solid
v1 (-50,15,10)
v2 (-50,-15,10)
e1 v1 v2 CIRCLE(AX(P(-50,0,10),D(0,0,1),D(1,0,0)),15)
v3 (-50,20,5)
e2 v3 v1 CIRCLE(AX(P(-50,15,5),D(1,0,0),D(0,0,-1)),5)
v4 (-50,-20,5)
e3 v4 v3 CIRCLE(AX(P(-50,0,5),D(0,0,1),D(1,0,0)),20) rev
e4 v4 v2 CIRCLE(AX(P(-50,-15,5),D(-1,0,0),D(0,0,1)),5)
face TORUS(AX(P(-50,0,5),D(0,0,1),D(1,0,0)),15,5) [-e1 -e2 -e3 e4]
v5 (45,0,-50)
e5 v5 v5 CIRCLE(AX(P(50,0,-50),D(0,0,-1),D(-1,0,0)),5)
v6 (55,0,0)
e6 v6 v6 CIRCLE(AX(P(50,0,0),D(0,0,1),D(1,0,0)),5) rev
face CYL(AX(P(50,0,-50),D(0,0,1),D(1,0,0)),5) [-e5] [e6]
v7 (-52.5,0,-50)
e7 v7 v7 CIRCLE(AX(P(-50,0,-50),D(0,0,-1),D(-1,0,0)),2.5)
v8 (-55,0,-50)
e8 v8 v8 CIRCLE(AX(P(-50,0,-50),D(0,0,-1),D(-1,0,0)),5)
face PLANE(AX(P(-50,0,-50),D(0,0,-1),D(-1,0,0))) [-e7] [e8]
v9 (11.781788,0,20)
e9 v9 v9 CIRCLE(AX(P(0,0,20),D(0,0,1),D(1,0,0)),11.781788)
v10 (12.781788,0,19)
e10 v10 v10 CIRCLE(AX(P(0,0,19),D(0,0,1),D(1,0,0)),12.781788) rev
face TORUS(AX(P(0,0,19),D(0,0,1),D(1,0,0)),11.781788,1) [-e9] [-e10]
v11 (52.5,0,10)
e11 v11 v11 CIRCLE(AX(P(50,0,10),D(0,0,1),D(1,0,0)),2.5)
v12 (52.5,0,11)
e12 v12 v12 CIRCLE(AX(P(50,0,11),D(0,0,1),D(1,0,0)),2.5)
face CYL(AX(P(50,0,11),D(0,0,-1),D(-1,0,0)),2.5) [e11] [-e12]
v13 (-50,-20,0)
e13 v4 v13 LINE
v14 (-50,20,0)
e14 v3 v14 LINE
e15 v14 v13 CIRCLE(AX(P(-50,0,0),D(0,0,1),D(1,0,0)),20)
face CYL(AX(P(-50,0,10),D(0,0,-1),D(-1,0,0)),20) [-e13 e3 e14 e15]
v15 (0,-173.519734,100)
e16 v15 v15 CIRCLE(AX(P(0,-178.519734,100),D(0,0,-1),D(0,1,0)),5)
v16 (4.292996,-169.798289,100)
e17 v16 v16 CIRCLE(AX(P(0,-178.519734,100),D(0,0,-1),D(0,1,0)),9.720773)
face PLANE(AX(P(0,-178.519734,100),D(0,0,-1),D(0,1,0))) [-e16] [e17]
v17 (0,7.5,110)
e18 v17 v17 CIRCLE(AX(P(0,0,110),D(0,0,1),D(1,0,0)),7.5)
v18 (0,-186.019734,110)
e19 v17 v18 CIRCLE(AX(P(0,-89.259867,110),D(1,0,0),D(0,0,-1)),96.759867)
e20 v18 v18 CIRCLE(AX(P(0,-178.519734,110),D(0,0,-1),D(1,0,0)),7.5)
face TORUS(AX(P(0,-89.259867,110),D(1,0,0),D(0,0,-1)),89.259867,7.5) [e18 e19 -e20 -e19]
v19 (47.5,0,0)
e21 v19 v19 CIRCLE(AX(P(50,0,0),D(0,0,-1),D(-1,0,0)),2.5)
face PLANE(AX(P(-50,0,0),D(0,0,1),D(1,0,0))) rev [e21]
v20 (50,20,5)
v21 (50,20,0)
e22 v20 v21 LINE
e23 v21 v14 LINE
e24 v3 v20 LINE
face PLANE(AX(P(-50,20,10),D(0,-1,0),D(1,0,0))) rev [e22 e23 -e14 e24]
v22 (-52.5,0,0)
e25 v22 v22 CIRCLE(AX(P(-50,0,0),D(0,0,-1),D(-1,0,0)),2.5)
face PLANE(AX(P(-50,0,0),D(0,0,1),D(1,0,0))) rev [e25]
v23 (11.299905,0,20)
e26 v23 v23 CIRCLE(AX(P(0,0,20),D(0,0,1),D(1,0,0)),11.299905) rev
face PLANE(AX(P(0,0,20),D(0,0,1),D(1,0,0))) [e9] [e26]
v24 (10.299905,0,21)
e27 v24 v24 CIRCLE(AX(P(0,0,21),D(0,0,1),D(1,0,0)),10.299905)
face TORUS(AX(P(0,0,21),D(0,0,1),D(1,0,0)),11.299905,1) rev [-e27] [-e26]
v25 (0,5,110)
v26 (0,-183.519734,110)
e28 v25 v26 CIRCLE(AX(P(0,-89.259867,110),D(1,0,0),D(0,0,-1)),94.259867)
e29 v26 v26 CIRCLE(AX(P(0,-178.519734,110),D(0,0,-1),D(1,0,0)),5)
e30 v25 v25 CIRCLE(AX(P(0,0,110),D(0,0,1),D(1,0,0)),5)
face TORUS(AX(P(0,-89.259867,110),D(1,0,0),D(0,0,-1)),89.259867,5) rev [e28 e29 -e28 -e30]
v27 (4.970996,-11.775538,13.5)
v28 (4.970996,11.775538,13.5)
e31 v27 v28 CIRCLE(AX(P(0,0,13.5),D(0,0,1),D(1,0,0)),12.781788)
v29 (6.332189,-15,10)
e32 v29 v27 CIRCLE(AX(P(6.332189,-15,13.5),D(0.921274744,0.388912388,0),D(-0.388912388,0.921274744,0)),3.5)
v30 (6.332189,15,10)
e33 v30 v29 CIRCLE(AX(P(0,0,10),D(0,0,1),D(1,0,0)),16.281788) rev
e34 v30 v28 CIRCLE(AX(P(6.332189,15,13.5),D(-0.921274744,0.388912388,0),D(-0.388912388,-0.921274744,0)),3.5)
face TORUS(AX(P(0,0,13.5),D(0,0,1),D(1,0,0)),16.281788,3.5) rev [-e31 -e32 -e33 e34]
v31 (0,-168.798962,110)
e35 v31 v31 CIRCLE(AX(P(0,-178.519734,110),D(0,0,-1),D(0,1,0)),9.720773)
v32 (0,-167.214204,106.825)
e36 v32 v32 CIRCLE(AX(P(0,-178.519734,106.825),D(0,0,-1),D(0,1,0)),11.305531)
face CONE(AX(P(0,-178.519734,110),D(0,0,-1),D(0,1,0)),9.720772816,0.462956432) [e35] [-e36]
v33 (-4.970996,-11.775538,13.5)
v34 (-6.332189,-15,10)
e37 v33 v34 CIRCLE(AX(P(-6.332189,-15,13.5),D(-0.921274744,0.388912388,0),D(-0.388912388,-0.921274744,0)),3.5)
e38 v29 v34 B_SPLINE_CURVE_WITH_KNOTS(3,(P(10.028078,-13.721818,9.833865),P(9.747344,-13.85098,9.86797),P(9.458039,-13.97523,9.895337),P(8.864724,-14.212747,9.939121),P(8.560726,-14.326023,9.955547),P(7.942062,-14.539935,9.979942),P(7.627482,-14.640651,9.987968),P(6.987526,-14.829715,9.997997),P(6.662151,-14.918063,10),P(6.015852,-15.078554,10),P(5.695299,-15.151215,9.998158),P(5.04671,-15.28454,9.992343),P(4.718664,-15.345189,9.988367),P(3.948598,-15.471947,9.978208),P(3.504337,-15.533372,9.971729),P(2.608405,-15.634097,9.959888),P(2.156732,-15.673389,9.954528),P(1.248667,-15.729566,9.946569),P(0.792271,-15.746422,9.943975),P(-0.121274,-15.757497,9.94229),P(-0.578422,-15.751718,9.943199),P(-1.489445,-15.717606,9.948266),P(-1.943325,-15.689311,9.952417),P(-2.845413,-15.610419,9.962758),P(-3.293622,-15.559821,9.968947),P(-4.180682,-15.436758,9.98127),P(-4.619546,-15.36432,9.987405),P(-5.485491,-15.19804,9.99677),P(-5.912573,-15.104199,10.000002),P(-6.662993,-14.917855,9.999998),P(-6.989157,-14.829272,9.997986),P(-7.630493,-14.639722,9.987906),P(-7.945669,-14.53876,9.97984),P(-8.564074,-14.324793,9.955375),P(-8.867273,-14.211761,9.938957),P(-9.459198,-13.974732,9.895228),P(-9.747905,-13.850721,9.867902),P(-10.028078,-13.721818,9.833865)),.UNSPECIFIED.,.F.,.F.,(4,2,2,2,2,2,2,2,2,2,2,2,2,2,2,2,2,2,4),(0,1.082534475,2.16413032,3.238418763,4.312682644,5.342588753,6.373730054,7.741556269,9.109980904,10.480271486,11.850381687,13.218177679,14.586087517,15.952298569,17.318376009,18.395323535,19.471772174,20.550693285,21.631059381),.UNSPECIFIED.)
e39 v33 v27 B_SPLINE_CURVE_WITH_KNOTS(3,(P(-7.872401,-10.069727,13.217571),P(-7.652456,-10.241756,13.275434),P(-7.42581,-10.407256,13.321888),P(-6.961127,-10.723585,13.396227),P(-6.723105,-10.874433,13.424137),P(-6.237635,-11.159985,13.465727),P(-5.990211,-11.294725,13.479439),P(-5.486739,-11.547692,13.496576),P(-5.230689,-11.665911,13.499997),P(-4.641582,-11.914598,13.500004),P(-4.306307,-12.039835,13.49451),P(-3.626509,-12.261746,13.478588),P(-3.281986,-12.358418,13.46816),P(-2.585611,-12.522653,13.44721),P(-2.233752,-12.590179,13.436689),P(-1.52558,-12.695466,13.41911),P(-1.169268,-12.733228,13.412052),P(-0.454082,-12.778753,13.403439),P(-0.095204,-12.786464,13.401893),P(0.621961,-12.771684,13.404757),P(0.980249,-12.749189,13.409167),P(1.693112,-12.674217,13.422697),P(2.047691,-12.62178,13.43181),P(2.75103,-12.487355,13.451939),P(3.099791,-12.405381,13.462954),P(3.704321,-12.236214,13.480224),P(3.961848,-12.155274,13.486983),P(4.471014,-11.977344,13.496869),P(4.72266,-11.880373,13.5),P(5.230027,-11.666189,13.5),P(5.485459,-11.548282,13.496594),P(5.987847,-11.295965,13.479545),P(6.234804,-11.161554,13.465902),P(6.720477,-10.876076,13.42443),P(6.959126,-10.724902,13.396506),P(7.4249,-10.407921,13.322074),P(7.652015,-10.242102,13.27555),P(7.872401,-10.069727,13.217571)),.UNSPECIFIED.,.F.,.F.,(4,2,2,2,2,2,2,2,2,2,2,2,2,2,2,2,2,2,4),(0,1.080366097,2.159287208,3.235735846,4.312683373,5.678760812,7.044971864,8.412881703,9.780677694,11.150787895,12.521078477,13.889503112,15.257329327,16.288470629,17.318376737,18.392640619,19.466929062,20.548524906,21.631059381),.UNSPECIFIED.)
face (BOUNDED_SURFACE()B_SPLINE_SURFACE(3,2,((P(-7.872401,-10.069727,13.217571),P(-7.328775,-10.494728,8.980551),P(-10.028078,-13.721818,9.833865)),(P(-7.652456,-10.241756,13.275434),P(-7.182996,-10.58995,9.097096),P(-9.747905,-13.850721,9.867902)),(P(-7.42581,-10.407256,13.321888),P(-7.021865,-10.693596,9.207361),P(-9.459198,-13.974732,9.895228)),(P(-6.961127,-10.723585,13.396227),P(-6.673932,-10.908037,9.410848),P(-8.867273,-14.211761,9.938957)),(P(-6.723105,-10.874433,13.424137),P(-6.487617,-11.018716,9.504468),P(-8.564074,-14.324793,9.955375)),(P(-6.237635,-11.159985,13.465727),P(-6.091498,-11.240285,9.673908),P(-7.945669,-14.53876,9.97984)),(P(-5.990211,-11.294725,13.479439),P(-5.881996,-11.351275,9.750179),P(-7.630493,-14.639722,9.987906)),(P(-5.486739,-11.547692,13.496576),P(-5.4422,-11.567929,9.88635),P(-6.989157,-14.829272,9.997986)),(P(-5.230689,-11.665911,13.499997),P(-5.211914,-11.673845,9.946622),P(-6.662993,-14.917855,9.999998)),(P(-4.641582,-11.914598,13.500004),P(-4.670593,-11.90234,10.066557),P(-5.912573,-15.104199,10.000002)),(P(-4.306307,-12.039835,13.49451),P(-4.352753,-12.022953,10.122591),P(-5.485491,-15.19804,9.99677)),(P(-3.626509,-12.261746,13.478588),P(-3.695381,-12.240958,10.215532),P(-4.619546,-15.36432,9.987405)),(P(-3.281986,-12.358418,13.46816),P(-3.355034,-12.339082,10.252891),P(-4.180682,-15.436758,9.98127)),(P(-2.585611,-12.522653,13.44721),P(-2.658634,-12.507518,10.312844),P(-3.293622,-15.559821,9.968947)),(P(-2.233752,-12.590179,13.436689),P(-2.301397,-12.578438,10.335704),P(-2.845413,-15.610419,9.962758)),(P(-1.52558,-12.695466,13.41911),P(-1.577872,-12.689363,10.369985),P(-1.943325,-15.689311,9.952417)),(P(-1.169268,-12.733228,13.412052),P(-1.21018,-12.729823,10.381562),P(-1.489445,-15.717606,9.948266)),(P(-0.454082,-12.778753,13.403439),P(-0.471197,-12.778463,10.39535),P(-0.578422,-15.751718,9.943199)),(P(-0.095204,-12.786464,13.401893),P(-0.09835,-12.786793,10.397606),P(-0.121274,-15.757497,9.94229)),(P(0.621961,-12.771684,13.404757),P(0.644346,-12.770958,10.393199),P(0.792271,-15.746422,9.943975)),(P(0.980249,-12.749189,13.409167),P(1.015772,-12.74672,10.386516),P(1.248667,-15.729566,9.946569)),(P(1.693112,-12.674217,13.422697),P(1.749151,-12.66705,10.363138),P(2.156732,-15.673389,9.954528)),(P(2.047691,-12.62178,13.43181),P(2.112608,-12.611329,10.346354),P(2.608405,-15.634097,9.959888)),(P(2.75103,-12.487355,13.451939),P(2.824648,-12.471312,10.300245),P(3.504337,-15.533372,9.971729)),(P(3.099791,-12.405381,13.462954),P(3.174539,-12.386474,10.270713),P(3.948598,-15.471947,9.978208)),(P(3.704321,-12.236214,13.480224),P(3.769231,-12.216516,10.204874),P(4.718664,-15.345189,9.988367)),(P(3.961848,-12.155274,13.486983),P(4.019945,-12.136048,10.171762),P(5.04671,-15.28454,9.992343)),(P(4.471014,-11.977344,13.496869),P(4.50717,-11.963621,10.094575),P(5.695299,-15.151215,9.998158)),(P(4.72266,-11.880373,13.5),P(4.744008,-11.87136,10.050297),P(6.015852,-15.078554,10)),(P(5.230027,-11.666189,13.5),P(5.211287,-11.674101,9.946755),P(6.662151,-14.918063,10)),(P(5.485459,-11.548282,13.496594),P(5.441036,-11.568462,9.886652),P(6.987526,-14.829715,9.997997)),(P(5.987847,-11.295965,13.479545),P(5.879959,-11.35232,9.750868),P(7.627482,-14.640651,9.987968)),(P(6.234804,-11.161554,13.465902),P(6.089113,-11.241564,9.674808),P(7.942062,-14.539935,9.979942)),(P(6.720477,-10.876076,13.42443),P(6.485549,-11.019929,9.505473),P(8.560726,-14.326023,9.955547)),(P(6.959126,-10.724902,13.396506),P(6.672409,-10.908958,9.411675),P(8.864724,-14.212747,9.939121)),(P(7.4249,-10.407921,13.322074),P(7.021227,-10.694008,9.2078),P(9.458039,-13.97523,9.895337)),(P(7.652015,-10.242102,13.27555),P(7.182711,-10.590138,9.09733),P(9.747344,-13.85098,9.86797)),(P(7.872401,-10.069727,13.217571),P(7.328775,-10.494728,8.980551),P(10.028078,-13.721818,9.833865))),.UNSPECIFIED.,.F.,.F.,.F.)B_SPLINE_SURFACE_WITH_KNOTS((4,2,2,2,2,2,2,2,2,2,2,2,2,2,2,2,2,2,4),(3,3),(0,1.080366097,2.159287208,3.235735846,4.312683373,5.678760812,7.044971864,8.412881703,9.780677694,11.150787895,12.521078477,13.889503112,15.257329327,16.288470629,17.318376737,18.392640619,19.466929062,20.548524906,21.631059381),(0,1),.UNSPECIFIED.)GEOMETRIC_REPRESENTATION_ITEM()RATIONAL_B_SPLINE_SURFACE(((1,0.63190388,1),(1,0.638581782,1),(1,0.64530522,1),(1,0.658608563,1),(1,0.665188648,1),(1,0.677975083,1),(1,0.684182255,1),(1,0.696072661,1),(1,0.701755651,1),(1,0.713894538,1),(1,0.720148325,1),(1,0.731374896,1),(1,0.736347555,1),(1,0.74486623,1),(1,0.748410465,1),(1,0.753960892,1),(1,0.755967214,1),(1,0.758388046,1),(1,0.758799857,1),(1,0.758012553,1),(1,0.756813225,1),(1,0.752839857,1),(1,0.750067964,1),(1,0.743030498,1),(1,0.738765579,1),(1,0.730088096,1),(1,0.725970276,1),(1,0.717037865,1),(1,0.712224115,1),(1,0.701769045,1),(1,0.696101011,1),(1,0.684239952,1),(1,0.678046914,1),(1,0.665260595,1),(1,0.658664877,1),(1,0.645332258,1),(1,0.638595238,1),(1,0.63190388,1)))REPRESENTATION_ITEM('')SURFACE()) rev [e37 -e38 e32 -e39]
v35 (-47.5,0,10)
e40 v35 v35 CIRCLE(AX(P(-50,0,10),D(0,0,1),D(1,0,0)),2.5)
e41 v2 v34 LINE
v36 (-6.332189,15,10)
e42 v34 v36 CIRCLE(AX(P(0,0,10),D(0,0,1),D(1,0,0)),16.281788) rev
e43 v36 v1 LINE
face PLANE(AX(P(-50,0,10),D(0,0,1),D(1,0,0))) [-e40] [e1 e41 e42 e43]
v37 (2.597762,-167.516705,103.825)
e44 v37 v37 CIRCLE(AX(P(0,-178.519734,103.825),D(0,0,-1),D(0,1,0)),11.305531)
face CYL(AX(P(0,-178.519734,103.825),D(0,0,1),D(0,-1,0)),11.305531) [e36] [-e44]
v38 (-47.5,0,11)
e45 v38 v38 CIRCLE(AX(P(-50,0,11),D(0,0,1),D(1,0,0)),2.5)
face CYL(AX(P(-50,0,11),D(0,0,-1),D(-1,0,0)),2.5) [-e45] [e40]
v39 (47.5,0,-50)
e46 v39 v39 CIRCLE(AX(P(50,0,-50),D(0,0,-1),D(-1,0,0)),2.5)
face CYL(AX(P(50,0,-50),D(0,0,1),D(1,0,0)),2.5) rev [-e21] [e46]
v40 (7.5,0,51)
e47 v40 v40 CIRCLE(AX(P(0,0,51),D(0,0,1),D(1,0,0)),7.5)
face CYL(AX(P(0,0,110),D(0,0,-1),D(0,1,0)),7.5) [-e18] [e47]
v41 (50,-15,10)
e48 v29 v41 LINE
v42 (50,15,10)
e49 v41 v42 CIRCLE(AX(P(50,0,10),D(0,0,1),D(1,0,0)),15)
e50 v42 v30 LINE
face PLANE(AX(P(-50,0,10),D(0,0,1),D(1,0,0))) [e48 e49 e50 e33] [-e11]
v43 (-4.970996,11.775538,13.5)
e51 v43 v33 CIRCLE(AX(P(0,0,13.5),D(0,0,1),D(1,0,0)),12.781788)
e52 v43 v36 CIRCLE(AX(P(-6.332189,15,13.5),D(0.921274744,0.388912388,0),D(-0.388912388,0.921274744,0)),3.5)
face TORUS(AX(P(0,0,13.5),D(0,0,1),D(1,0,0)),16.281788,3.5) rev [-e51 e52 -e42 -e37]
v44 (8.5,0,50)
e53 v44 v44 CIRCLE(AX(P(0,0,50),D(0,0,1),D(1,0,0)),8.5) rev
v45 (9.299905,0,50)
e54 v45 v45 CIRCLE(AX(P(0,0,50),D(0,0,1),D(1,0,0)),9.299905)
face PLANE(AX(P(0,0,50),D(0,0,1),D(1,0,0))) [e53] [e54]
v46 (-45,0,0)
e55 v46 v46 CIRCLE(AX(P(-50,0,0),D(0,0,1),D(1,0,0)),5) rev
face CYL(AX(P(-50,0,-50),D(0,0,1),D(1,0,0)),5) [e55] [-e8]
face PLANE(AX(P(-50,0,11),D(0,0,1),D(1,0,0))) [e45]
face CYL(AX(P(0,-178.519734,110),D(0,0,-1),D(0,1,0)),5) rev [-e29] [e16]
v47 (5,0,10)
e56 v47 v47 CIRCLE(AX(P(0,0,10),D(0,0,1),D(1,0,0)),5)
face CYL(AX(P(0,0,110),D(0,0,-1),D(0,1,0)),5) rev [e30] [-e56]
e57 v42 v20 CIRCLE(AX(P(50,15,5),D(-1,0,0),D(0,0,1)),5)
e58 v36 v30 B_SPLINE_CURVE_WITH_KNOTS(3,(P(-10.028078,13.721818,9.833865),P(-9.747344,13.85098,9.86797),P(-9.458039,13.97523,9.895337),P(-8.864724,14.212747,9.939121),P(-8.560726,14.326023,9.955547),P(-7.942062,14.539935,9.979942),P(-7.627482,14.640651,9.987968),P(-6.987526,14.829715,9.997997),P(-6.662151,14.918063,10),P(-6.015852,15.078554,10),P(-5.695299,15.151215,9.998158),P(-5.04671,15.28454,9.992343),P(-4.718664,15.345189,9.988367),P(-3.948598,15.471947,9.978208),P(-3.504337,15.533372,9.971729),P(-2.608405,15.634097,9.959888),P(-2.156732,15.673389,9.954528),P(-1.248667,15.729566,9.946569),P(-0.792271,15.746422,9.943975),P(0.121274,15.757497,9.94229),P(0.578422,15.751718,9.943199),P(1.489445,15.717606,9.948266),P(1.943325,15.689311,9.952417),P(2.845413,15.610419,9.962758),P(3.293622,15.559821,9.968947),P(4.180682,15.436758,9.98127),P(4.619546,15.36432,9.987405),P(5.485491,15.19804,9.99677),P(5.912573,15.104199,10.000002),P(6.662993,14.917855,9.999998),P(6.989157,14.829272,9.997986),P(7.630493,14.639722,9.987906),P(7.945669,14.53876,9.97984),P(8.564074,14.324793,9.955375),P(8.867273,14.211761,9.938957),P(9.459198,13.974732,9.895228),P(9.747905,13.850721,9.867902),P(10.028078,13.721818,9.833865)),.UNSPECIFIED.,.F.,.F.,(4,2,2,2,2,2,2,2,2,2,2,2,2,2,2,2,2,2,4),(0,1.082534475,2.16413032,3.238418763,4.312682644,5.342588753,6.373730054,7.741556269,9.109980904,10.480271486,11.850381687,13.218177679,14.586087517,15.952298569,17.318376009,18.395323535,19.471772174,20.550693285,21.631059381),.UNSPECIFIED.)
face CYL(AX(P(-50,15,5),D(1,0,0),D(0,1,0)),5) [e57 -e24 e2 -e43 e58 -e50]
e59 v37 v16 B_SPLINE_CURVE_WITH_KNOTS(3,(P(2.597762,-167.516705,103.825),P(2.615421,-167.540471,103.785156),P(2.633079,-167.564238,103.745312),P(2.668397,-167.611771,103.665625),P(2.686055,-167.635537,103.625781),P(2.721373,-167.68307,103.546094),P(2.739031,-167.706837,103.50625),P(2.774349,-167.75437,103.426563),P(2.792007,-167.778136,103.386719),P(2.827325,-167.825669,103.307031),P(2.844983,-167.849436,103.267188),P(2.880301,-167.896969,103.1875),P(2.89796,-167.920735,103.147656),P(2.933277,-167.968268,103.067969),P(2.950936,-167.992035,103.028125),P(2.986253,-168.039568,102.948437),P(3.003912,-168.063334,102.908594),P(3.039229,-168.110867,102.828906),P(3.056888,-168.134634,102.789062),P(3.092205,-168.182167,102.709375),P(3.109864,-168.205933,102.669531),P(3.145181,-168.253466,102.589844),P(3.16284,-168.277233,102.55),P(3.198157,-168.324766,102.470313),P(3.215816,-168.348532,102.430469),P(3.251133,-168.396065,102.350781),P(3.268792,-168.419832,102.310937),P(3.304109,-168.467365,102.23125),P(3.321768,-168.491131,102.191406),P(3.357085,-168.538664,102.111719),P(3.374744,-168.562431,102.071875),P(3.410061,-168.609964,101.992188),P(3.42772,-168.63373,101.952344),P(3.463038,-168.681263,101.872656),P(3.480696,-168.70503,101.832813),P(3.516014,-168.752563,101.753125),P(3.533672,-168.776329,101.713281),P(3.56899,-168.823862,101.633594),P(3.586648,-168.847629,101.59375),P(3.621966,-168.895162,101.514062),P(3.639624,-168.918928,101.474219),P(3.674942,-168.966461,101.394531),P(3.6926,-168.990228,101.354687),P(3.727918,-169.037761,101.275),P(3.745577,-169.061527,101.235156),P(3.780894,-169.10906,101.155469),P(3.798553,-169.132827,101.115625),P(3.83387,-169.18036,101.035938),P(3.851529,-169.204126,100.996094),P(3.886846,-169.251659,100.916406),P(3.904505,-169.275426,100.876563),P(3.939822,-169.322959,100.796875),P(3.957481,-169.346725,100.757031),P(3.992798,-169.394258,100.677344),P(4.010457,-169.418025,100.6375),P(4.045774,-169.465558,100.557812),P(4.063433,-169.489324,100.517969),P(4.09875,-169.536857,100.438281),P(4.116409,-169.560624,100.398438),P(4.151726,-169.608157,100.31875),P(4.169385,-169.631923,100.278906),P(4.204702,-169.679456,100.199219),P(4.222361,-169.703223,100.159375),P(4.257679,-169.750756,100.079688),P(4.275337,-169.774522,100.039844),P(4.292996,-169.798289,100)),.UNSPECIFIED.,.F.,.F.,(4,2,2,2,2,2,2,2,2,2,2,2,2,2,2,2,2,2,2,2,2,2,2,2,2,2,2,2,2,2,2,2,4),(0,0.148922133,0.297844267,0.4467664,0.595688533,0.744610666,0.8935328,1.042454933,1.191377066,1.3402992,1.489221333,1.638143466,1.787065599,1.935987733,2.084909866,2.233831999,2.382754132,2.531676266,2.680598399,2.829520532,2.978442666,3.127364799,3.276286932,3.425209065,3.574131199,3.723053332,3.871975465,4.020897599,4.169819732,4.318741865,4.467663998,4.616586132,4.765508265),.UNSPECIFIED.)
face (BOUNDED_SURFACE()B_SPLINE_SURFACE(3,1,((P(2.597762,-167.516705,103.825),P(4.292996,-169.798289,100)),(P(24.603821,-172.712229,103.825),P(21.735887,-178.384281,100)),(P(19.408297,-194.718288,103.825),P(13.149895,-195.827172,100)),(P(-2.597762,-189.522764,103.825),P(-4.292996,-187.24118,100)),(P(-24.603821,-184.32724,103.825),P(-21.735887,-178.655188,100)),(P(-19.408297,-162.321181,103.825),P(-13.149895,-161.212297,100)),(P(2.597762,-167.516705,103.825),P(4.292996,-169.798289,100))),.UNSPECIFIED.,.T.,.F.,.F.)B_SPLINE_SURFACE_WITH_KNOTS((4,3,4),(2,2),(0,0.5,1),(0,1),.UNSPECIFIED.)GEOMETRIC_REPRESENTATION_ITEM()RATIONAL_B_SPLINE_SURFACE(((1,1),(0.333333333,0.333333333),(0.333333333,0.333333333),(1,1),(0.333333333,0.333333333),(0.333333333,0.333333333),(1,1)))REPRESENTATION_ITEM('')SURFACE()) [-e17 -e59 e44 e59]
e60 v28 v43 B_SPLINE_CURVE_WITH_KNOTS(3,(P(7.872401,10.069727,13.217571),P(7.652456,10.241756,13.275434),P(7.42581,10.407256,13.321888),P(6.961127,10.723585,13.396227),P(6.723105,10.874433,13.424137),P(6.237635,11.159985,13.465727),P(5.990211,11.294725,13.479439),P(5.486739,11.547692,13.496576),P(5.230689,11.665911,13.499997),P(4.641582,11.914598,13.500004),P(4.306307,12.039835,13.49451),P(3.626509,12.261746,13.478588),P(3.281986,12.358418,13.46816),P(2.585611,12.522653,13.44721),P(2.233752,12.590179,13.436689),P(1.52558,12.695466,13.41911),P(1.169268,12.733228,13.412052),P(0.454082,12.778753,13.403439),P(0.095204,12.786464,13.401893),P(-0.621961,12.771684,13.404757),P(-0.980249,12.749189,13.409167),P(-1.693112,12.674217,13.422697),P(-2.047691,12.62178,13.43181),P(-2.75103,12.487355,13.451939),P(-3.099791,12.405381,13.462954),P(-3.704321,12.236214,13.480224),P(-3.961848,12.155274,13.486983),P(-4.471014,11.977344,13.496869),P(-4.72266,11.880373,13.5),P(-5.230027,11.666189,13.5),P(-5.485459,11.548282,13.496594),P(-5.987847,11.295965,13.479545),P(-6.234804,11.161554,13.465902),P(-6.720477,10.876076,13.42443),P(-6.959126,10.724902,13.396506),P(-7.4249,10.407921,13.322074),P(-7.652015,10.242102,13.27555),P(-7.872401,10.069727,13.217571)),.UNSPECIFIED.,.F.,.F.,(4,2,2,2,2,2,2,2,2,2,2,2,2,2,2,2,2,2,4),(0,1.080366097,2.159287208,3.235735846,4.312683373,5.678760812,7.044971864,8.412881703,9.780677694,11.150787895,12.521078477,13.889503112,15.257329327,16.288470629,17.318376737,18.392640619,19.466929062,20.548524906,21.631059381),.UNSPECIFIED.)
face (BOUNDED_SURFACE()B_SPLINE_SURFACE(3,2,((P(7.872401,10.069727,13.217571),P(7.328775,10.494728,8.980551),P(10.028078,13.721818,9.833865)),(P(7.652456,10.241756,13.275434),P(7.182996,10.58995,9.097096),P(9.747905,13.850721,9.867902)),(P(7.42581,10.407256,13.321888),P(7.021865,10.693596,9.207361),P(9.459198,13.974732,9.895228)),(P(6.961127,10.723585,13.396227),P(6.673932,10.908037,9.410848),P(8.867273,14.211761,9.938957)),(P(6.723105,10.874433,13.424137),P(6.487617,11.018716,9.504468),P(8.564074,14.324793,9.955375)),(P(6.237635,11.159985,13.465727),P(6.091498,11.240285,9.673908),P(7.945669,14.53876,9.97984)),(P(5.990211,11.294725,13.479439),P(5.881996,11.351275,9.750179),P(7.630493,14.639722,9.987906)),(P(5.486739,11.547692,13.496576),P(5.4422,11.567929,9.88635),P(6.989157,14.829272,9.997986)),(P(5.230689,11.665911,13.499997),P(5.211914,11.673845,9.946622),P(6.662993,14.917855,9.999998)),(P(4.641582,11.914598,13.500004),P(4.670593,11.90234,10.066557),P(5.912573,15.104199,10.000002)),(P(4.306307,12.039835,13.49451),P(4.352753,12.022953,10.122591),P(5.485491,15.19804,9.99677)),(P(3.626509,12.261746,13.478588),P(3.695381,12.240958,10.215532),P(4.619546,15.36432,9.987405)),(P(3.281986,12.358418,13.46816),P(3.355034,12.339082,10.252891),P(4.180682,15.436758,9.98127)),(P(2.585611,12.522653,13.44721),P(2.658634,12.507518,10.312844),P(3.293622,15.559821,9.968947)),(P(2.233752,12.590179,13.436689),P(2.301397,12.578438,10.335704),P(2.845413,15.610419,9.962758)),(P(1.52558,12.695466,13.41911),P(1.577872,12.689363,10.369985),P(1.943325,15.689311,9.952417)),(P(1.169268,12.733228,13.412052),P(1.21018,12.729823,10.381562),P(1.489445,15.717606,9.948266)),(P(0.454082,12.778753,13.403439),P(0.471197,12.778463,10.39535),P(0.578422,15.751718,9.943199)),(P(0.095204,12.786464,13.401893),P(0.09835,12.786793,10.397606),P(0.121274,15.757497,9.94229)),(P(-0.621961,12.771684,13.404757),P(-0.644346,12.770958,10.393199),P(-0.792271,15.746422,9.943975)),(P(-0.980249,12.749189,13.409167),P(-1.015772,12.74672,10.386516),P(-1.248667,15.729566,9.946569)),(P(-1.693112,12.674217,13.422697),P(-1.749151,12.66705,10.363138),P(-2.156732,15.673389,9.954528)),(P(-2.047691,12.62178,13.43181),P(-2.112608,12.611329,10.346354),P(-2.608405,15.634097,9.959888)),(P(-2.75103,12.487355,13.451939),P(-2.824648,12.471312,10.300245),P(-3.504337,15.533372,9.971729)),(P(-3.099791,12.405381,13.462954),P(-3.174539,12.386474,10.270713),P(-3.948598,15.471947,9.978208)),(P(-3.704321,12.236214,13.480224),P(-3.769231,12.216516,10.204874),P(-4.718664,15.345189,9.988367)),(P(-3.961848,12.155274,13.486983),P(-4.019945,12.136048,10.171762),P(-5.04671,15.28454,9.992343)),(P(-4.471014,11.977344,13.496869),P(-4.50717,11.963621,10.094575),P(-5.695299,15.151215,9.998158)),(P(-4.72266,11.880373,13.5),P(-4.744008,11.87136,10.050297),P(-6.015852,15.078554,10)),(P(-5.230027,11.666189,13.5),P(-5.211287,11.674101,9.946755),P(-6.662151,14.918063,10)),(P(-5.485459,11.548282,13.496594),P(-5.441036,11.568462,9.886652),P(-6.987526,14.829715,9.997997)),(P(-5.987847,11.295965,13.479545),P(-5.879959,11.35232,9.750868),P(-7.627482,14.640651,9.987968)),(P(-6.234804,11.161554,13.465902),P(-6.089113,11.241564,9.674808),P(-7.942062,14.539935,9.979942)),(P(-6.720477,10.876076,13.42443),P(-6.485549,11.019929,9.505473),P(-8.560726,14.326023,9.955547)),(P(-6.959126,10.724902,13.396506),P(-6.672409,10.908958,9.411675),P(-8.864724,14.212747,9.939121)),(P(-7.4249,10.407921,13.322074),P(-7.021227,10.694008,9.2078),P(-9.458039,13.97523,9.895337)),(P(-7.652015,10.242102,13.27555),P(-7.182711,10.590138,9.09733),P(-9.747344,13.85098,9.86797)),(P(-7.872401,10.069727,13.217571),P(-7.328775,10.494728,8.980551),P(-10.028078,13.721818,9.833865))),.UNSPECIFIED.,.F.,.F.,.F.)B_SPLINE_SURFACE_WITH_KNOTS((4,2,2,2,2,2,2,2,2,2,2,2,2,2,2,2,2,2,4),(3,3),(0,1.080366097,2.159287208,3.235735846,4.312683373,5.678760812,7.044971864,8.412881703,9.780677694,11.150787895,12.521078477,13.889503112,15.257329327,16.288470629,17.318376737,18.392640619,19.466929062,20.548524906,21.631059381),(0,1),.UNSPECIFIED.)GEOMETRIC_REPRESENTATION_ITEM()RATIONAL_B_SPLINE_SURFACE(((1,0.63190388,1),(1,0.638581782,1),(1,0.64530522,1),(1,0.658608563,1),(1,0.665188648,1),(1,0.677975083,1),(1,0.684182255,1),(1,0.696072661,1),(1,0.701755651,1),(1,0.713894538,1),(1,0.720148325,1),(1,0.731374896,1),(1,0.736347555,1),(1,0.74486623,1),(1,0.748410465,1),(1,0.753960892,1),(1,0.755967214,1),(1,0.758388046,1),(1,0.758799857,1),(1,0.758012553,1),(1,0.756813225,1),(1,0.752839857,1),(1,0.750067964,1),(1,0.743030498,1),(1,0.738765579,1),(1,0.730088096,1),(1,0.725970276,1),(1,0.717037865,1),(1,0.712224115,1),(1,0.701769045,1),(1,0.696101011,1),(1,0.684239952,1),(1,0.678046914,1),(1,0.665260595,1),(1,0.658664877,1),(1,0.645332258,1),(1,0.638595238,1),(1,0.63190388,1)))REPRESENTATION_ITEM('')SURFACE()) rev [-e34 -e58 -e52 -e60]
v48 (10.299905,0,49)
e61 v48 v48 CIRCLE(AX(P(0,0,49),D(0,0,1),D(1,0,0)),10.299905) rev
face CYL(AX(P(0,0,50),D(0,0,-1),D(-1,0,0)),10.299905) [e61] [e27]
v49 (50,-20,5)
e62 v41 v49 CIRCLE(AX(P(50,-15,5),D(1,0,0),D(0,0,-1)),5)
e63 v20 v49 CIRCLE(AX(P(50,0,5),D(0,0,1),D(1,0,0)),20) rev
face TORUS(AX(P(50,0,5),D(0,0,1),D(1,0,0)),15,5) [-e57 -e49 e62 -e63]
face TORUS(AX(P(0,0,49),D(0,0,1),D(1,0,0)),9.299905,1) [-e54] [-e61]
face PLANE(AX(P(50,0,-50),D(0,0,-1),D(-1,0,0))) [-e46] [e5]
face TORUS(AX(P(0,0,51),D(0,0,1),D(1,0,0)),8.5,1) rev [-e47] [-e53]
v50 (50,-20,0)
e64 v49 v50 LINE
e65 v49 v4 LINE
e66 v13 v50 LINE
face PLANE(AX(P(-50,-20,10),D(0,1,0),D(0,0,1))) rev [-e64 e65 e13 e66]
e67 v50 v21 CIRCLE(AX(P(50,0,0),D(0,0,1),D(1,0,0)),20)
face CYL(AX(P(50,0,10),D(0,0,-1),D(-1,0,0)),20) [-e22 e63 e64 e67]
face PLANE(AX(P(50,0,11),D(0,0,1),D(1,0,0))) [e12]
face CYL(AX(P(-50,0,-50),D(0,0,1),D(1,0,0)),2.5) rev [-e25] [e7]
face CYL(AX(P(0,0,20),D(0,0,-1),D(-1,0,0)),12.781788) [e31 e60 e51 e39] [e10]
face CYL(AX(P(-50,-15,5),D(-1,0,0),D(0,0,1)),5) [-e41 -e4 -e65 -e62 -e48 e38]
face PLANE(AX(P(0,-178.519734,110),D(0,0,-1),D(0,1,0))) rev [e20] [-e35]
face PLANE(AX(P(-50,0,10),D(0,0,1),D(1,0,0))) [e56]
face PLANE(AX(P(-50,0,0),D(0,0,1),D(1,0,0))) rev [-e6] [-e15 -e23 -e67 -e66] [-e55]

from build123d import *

# Parameters (mm, degrees)
BASE_EXTRUDE_DEPTH  = 10
SKETCH2_R           = 5
SKETCH2_R_2         = 2.5
BOSS_EXTRUDE1_DEPTH = 50
SKETCH4_R           = 7.5
SKETCH4_R_2         = 5
FILLET1_R           = 5
BOSS_EXTRUDE2_START = 10
SKETCH6_R           = 12.781787914
SKETCH6_R_2         = 5
BOSS_EXTRUDE2_DEPTH = 10
BOSS_EXTRUDE3_START = 30
SKETCH7_R           = 10.299904742
SKETCH7_R_2         = 5
BOSS_EXTRUDE3_DEPTH = 30
FILLET3_R           = 1
FILLET4_R           = 3.5
FILLET11_R          = 1
SKETCH8_R           = 9.720772816
SKETCH13_R          = 11.305530655
SKETCH14_R          = 11.305530655
BOSS_EXTRUDE4_DEPTH = 3
SKETCH17_R          = 5
CUT_EXTRUDE1_DEPTH  = 10
BOSS_EXTRUDE5_START = 1
SKETCH16_R          = 2.5
BOSS_EXTRUDE5_DEPTH = 1


with BuildPart() as part:
    # Sketch1 → Base-Extrude (new body)
    with BuildSketch(Plane.XY):
        with BuildLine():
            Line((-50, 20), (50, 20))
            ThreePointArc((50, 20), (70, 0), (50, -20))
            Line((50, -20), (-50, -20))
            ThreePointArc((-50, -20), (-70, 0), (-50, 20))
        make_face()
    extrude(amount=BASE_EXTRUDE_DEPTH)

    # Sketch2 → Boss-Extrude1 (add)
    # profile 1 of 2: a face of its own
    with BuildSketch(Plane(origin=(0, 0, 0), x_dir=(-1, 0, 0), z_dir=(0, 0, -1))):
        with Locations(Location((50, 0, 0), (0, 0, 180))):
            Circle(SKETCH2_R)
        with Locations((50, 0)):
            Circle(SKETCH2_R_2, mode=Mode.SUBTRACT)
    # profile 2 of 2: a face of its own
    with BuildSketch(Plane(origin=(0, 0, 0), x_dir=(-1, 0, 0), z_dir=(0, 0, -1))):
        with Locations(Location((-50, 0, 0), (0, 0, 180))):
            Circle(SKETCH2_R)
        with Locations((-50, 0)):
            Circle(SKETCH2_R_2, mode=Mode.SUBTRACT)
    extrude(amount=BOSS_EXTRUDE1_DEPTH)

    # Boss-Sweep1: sweep along a path in Sketch3
    with BuildLine(Plane(origin=(0, 0, 0), x_dir=(0, 0, -1), z_dir=(1, 0, 0))) as boss_sweep1_path:
        Line((-10, -1.759867214), (-110, -1.759867214))
        ThreePointArc((-110, -1.759867214), (-197.5, -89.259867214), (-110, -176.759867214))
    # Sketch4 → Boss-Sweep1 (sweep)
    with BuildSketch(Plane.XY.offset(10)):
        Circle(SKETCH4_R)
        Circle(SKETCH4_R_2, mode=Mode.SUBTRACT)
    sweep(path=boss_sweep1_path.line)

    # Fillet1
    fillet1_edges = [part.edges().sort_by_distance(p)[0] for p in [
        (70, 0, 10),
        (0, 20, 10),
        (-70, 0, 10),
        (0, -20, 10),
    ]]
    fillet(fillet1_edges, radius=FILLET1_R)

    # Sketch6 → Boss-Extrude2 (add)
    with BuildSketch(Plane.XY.offset(10).offset(BOSS_EXTRUDE2_START)):
        Circle(SKETCH6_R)
        with Locations(Location((0, 0, 0), (0, 0, 90))):
            Circle(SKETCH6_R_2, mode=Mode.SUBTRACT)
    extrude(amount=-BOSS_EXTRUDE2_DEPTH)

    # Sketch7 → Boss-Extrude3 (add)
    with BuildSketch(Plane.XY.offset(20).offset(BOSS_EXTRUDE3_START)):
        Circle(SKETCH7_R)
        with Locations(Location((0, 0, 0), (0, 0, 90))):
            Circle(SKETCH7_R_2, mode=Mode.SUBTRACT)
    extrude(amount=-BOSS_EXTRUDE3_DEPTH)

    # Fillet3
    fillet3_edges = [part.edges().sort_by_distance(p)[0] for p in [
        (-12.781787914, 0, 20),
        (-10.299904742, 0, 20),
    ]]
    fillet(fillet3_edges, radius=FILLET3_R)

    # Fillet4
    fillet4_edges = [part.edges().sort_by_distance(p)[0] for p in [
        (-12.781787914, 0, 10),
    ]]
    fillet(fillet4_edges, radius=FILLET4_R)

    # Fillet11
    fillet11_edges = [part.edges().sort_by_distance(p)[0] for p in [
        (-10.299904742, 0, 50),
        (-7.5, 0, 50),
    ]]
    fillet(fillet11_edges, radius=FILLET11_R)

    # Sketch8 → Boss-Loft2 section 0
    with BuildSketch(Plane(origin=(0, 0, 110), x_dir=(-1, 0, 0), z_dir=(0, 0, -1))):
        with Locations((0, -178.519734428)):
            Circle(SKETCH8_R)
    # Sketch13 → Boss-Loft2 section 1
    with BuildSketch(Plane(origin=(0, 0, 106.825), x_dir=(-1, 0, 0), z_dir=(0, 0, -1))):
        with Locations((0, -178.519734428)):
            Circle(SKETCH13_R)
    loft()

    # Sketch14 → Boss-Extrude4 (add)
    with BuildSketch(Plane(origin=(0, 0, 106.825), x_dir=(-1, 0, 0), z_dir=(0, 0, -1))):
        with Locations(Location((0, -178.519734428, 0), (0, 0, 90))):
            Circle(SKETCH14_R)
    extrude(amount=BOSS_EXTRUDE4_DEPTH)

    # Boss-Loft3: read off the stored shape, not the designer's step
    # Boss-Loft3: loft between two sections, ruled curve by curve
    boss_loft3_from = [
        Edge.make_bspline([(2.597761832, -167.516704989, 103.825), (24.603820711, -172.712228652, 103.825), (19.408297048, -194.718287532, 103.825), (-2.597761832, -189.522763868, 103.825), (-24.603820711, -184.327240205, 103.825), (-19.408297048, -162.321181325, 103.825), (2.597761832, -167.516704989, 103.825)], [0, 0, 0, 0, 0.5, 0.5, 0.5, 1, 1, 1, 1], 3, [1, 0.333333333, 0.333333333, 1, 0.333333333, 0.333333333, 1]),
    ]
    boss_loft3_to = [
        Edge.make_bspline([(4.292995877, -169.79828899, 100), (21.735886755, -178.384280744, 100), (13.149895, -195.827171622, 100), (-4.292995877, -187.241179867, 100), (-21.735886755, -178.655188112, 100), (-13.149895, -161.212297235, 100), (4.292995877, -169.79828899, 100)], [0, 0, 0, 0, 0.5, 0.5, 0.5, 1, 1, 1, 1], 3, [1, 0.333333333, 0.333333333, 1, 0.333333333, 0.333333333, 1]),
    ]
    boss_loft3 = Solid(Shell([*[Face.make_surface_from_curves(boss_loft3_from[k], boss_loft3_to[k]) for k in range(1)], Face(Wire(boss_loft3_from)), Face(Wire(boss_loft3_to))]))
    add(boss_loft3)

    # Sketch17 → Cut-Extrude1 (cut)
    with BuildSketch(Plane(origin=(0, 0, 100), x_dir=(-1, 0, 0), z_dir=(0, 0, -1))):
        with Locations(Location((0, -178.519734428, 0), (0, 0, 90))):
            Circle(SKETCH17_R)
    extrude(amount=-CUT_EXTRUDE1_DEPTH, mode=Mode.SUBTRACT)

    # Sketch16 → Boss-Extrude5 (add)
    with BuildSketch(Plane.XY.offset(10).offset(BOSS_EXTRUDE5_START)):
        with Locations(Location((-50, 0, 0), (0, 0, 180))):
            Circle(SKETCH16_R)
        with Locations(Location((50, 0, 0), (0, 0, 180))):
            Circle(SKETCH16_R)
    extrude(amount=-BOSS_EXTRUDE5_DEPTH)


solid = part.part
